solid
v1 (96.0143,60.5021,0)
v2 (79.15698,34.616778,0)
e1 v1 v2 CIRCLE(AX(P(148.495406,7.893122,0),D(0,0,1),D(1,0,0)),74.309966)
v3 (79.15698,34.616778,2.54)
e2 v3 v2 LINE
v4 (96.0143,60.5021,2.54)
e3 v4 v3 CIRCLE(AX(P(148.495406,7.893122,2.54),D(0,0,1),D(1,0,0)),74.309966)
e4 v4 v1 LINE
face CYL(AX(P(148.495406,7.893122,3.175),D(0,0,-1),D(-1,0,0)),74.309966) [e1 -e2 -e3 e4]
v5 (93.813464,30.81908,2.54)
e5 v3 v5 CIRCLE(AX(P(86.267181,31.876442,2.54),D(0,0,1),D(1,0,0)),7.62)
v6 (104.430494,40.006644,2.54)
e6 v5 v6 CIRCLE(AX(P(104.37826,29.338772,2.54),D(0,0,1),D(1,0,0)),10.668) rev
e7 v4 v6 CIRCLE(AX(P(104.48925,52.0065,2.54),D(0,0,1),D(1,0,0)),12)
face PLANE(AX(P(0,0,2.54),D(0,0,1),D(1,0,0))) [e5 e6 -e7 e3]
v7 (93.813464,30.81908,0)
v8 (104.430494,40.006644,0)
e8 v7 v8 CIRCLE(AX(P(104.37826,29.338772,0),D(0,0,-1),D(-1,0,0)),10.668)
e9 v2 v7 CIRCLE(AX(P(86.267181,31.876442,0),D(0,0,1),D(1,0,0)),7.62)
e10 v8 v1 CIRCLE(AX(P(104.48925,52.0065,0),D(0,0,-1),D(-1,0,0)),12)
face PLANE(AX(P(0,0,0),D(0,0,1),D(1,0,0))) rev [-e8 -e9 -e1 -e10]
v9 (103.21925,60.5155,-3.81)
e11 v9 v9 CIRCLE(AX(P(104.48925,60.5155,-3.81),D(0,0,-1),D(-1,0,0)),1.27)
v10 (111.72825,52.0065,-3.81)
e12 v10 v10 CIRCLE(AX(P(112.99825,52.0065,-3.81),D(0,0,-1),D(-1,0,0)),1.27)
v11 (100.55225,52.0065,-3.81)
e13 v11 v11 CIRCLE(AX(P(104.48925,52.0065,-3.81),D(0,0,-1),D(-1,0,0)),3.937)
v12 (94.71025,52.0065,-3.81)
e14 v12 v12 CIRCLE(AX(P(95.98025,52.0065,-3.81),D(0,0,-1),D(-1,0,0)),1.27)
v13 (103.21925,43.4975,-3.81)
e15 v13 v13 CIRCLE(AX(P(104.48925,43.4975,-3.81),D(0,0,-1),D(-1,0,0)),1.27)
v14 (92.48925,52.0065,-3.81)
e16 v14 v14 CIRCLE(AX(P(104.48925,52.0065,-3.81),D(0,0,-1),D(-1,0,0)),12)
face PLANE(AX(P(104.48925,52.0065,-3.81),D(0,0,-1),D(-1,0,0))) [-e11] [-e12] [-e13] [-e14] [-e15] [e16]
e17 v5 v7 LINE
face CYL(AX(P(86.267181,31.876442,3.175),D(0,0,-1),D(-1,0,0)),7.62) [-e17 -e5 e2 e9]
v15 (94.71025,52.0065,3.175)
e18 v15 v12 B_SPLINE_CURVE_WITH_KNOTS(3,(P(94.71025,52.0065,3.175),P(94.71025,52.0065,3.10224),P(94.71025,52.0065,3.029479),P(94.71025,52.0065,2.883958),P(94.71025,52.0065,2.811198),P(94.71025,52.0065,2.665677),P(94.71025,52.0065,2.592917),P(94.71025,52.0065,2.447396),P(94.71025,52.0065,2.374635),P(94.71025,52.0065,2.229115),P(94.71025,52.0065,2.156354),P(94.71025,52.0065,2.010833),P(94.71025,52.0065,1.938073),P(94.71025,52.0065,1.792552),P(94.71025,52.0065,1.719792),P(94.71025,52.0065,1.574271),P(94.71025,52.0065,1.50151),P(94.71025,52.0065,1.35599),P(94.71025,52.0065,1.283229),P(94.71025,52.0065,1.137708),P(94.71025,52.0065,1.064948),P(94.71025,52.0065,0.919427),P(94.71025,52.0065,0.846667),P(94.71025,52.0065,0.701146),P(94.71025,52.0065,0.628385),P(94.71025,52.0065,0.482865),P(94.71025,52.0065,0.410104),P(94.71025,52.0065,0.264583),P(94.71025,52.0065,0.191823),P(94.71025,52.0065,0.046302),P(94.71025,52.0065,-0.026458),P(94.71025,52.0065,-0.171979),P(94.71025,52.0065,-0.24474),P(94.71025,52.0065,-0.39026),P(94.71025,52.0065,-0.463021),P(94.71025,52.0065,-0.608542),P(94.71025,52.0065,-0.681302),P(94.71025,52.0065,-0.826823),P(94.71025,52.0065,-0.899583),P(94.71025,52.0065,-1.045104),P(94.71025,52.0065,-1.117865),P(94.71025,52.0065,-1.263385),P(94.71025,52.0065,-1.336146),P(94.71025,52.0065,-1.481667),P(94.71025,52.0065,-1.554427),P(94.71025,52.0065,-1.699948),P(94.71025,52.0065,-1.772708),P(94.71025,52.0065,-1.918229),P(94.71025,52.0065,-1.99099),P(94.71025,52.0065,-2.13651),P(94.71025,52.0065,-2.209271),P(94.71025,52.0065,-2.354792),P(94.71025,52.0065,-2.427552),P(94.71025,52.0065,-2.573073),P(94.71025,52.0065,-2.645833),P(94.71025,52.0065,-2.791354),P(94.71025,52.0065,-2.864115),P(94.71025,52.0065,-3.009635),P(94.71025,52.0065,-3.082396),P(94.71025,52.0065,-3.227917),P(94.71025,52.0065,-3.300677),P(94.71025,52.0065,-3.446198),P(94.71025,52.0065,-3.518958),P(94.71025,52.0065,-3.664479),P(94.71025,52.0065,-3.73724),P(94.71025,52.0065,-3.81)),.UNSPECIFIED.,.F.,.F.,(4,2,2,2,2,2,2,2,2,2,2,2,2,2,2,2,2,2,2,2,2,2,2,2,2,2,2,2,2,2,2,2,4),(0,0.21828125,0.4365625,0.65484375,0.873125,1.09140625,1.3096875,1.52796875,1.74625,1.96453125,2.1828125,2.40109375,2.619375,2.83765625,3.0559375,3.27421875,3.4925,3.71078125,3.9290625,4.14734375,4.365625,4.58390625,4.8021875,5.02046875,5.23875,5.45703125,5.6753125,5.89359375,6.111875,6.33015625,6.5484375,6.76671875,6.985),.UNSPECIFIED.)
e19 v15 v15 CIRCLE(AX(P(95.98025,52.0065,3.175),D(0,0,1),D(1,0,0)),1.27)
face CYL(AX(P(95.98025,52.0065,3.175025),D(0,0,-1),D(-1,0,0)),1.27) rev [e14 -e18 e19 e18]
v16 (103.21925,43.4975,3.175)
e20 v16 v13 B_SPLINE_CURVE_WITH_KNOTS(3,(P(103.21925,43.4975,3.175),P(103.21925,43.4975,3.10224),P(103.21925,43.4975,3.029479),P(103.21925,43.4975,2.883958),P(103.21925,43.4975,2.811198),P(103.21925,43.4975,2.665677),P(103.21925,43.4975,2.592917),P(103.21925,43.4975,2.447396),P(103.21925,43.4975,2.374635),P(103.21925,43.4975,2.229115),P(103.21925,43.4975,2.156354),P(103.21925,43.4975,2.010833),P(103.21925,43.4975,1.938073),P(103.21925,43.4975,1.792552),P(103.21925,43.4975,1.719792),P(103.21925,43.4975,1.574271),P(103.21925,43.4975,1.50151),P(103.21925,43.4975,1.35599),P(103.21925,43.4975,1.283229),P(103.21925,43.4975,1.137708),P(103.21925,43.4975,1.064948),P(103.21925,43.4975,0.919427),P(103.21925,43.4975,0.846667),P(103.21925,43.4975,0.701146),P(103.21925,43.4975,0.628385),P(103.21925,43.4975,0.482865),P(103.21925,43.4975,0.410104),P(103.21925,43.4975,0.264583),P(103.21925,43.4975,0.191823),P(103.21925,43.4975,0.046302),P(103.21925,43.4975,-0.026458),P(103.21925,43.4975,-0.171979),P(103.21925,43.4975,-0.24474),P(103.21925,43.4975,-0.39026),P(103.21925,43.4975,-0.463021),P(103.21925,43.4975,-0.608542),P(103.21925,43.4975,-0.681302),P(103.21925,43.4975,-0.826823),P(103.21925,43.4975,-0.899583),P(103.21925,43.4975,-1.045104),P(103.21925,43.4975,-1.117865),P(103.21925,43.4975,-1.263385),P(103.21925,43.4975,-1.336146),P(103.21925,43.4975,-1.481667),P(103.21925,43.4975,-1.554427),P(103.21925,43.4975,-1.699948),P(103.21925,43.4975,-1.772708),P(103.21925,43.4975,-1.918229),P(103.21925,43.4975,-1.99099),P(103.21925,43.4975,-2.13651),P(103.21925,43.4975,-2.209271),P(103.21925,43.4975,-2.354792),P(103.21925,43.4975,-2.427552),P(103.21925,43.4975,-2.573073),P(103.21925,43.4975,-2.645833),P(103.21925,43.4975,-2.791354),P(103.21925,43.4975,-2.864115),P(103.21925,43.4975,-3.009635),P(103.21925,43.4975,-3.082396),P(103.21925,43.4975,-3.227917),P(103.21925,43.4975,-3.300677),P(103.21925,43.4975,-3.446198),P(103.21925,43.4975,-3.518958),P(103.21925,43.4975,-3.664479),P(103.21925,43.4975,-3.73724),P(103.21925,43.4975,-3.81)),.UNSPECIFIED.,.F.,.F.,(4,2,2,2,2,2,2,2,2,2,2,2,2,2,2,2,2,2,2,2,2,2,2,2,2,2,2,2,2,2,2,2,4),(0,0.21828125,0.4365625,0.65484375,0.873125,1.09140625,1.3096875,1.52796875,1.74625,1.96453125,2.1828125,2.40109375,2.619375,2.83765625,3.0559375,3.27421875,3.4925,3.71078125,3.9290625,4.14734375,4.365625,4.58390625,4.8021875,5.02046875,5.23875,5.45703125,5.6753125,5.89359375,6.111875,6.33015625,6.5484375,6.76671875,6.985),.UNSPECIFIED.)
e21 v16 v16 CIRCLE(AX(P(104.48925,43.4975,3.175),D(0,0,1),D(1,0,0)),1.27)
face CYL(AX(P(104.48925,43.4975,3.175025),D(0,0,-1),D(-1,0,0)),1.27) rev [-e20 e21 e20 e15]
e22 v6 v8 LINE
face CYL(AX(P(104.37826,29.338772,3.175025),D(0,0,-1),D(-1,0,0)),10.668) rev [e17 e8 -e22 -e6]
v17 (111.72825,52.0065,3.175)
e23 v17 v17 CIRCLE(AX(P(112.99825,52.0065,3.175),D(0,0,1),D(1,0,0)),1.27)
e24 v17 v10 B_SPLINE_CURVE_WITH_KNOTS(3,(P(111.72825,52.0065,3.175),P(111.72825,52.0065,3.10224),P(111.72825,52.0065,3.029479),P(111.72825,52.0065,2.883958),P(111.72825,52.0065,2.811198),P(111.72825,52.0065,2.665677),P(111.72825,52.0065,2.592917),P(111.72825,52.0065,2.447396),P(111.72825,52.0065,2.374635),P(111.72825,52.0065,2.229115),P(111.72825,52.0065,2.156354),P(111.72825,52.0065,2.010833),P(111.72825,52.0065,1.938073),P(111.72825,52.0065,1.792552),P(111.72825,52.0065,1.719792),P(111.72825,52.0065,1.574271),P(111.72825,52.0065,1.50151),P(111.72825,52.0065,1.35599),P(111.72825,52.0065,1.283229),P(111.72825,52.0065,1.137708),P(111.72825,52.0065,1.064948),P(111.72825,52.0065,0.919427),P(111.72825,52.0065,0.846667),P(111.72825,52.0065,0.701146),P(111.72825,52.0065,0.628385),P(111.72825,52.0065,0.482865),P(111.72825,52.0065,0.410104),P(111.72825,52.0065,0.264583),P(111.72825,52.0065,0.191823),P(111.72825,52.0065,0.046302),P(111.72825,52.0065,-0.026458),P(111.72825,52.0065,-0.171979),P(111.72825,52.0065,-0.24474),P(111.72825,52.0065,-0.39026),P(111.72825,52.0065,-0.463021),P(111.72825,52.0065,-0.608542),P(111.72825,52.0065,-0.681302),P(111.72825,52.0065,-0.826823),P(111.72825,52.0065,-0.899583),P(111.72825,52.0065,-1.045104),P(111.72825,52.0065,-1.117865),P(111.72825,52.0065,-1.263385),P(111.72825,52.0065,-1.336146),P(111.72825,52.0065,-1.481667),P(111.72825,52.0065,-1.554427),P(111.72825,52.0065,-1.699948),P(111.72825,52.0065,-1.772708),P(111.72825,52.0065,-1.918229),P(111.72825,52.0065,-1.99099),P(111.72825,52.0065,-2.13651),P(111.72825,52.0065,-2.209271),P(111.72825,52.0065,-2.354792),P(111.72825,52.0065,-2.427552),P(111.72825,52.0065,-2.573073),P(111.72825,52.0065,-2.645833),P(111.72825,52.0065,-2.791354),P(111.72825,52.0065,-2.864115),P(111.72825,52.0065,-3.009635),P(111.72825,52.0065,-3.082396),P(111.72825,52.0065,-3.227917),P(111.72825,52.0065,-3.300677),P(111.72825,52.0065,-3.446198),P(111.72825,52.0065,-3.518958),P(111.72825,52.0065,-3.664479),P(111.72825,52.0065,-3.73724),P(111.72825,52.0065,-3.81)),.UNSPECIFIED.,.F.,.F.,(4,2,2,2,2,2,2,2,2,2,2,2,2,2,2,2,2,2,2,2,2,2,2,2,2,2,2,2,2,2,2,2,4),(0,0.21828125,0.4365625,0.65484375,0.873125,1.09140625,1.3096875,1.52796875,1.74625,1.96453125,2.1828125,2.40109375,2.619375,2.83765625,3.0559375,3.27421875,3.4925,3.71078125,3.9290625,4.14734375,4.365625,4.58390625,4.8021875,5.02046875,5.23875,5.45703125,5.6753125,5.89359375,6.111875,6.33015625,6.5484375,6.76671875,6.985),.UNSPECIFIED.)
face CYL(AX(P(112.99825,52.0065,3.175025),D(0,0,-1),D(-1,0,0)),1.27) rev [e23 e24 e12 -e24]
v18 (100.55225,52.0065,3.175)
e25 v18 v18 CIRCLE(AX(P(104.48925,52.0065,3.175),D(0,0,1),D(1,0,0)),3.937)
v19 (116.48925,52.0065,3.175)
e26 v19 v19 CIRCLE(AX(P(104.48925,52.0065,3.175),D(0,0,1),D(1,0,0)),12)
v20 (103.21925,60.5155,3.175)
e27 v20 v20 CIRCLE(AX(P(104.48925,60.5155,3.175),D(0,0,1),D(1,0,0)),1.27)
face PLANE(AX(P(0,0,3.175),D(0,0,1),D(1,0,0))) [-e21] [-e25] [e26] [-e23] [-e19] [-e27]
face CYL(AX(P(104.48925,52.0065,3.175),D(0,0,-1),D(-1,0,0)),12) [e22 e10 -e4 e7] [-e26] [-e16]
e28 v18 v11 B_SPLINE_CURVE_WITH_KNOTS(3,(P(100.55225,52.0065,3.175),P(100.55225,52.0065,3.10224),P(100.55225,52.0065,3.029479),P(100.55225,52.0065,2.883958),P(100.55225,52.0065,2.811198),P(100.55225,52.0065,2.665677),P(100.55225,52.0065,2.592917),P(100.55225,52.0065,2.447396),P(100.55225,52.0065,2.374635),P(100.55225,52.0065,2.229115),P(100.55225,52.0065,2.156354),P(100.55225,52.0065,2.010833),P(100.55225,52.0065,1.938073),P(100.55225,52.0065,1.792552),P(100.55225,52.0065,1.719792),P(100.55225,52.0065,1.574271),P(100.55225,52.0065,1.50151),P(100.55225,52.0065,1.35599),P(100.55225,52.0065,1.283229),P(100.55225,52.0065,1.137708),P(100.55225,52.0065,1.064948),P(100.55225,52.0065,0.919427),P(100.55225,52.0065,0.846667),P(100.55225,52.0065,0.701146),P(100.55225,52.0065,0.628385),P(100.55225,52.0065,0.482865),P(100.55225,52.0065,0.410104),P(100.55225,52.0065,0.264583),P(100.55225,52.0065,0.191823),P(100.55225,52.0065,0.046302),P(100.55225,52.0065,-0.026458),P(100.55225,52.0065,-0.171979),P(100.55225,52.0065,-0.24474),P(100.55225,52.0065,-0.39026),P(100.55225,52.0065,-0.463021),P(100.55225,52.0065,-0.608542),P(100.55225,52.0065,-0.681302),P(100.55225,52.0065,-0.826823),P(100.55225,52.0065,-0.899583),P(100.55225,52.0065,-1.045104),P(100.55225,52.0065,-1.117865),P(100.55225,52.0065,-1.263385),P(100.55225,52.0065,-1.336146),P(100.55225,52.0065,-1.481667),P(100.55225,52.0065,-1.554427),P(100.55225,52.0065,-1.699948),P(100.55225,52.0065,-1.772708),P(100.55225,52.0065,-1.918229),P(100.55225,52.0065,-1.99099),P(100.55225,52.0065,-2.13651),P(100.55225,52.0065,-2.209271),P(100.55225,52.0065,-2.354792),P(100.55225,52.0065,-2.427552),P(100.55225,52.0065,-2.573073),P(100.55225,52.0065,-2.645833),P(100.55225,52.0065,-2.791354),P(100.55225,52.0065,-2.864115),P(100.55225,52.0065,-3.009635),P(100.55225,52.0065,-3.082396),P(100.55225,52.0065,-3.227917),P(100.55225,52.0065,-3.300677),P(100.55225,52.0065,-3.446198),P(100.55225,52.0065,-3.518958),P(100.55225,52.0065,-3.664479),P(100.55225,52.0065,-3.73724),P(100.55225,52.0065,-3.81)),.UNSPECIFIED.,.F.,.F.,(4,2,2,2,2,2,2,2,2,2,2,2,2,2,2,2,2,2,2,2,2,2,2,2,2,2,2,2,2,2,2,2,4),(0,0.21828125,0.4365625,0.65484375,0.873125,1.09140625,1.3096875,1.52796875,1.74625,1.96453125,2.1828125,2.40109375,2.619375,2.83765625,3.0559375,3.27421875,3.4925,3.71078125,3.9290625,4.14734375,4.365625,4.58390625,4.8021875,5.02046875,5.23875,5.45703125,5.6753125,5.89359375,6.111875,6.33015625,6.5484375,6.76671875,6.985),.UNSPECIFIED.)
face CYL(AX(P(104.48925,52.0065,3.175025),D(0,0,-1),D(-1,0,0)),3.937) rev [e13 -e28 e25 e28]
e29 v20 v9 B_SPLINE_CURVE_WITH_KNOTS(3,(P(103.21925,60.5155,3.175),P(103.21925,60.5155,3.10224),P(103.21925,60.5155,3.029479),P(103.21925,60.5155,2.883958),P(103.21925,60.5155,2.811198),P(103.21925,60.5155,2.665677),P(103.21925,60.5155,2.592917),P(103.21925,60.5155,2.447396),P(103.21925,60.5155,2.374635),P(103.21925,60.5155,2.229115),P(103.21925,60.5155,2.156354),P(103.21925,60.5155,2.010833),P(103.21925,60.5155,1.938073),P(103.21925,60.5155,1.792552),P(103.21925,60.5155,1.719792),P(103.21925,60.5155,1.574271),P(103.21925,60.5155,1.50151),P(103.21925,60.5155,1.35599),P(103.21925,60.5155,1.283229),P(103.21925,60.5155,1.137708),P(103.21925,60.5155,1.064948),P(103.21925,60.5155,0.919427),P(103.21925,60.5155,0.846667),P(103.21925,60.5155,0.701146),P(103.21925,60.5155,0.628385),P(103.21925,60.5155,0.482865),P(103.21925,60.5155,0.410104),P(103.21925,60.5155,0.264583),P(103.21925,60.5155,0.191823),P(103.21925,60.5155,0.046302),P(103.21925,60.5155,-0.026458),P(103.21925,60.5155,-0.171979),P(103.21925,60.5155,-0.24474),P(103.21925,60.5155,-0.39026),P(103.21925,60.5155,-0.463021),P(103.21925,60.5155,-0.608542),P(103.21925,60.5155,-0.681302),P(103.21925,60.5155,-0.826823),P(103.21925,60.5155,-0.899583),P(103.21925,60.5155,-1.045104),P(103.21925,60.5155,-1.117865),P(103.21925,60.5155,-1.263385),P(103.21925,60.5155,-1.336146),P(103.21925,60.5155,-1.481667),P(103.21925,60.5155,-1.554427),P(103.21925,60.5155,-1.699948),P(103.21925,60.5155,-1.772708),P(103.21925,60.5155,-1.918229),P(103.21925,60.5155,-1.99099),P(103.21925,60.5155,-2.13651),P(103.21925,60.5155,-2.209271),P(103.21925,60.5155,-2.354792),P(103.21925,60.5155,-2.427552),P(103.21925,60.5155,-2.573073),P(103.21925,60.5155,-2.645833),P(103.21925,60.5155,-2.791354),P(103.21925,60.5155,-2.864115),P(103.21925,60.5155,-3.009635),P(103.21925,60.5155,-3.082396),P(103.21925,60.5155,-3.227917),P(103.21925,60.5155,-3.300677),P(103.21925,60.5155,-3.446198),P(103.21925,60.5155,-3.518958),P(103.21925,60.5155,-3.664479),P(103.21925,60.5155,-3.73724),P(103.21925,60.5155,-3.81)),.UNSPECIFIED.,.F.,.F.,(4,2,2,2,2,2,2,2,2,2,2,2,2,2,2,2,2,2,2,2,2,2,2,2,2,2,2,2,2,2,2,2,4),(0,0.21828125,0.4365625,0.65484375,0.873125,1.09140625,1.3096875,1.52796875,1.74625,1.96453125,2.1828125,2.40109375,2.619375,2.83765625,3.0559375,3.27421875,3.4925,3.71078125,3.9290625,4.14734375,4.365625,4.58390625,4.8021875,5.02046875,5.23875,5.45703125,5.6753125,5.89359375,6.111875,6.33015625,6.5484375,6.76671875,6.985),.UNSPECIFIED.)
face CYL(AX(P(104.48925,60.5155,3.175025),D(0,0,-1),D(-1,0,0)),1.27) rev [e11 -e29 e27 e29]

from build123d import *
from build123d.topology import SkipClean

# Parameters (mm, degrees)
BOSS_EXTRUDE1_DEPTH = 3.175
BOSS_EXTRUDE2_START = 3.81
SKETCH2_R           = 12
BOSS_EXTRUDE2_DEPTH = 3.81
SKETCH3_R           = 3.937
CUT_EXTRUDE1_DEPTH  = 134.099089527
SKETCH4_R           = 1.27
CUT_EXTRUDE2_DEPTH  = 134.099089527
CUT_EXTRUDE3_DEPTH  = 133.970273023
CUT_EXTRUDE4_START  = -0.635
CUT_EXTRUDE4_DEPTH  = 0.635


with BuildPart() as part:
    # Sketch1 → Boss-Extrude1 (new body)
    with BuildSketch(Plane.XY):
        with BuildLine():
            ThreePointArc((113.784062988, 44.416608597), (112.542436022, 60.902914722), (96.014300162, 60.502100346))
            ThreePointArc((96.014300162, 60.502100346), (86.225733854, 48.445051897), (79.156979953, 34.616777747))
            ThreePointArc((79.156979953, 34.616777747), (81.153408489, 26.227218543), (89.699693339, 25.073335615))
            ThreePointArc((89.699693339, 25.073335615), (102.758092485, 33.479680479), (113.784062988, 44.416608597))
        make_face()
    extrude(amount=BOSS_EXTRUDE1_DEPTH)

    # Sketch2 → Boss-Extrude2 (add)
    with SkipClean():  # the faces are left unmerged after this step: merging them gives an invalid solid
        with BuildSketch(Plane(origin=(0, 0, 0), x_dir=(-1, 0, 0), z_dir=(0, 0, -1)).offset(BOSS_EXTRUDE2_START)):
            with Locations((-104.48925, 52.0065)):
                Circle(SKETCH2_R)
        extrude(amount=-BOSS_EXTRUDE2_DEPTH)

    # Sketch3 → Cut-Extrude1 (cut, through all)
    with SkipClean():  # the faces are left unmerged after this step: merging them gives an invalid solid
        with BuildSketch(Plane(origin=(0, 0, -3.81), x_dir=(-1, 0, 0), z_dir=(0, 0, -1))):
            with Locations((-104.48925, 52.0065)):
                Circle(SKETCH3_R)
        extrude(amount=-CUT_EXTRUDE1_DEPTH, mode=Mode.SUBTRACT)

    # Sketch4 → Cut-Extrude2 (cut, through all)
    with SkipClean():  # the faces are left unmerged after this step: merging them gives an invalid solid
        with BuildSketch(Plane(origin=(0, 0, -3.81), x_dir=(-1, 0, 0), z_dir=(0, 0, -1))):
            with Locations((-95.98025, 52.0065)):
                Circle(SKETCH4_R)
            with Locations((-112.99825, 52.0065)):
                Circle(SKETCH4_R)
            with Locations((-104.48925, 43.4975)):
                Circle(SKETCH4_R)
            with Locations((-104.48925, 60.5155)):
                Circle(SKETCH4_R)
        extrude(amount=-CUT_EXTRUDE2_DEPTH, mode=Mode.SUBTRACT)

    # Sketch5 → Cut-Extrude3 (cut, through all)
    with SkipClean():  # the faces are left unmerged after this step: merging them gives an invalid solid
        with BuildSketch(Plane(origin=(0, 0, 0), x_dir=(-1, 0, 0), z_dir=(0, 0, -1))):
            with BuildLine():
                ThreePointArc((-104.430493989, 40.006643845), (-109.606684651, 41.15238269), (-113.7840634, 44.4166091))
                ThreePointArc((-113.7840634, 44.4166091), (-102.758092767, 33.479680706), (-89.699693406, 25.073335649))
                ThreePointArc((-89.699693406, 25.073335649), (-92.462895691, 27.440507008), (-93.81346398, 30.819079549))
                ThreePointArc((-93.81346398, 30.819079549), (-97.397477458, 37.40567327), (-104.430493989, 40.006643845))
            make_face()
        extrude(amount=-CUT_EXTRUDE3_DEPTH, mode=Mode.SUBTRACT)

    # Sketch6 → Cut-Extrude4 (cut)
    with SkipClean():  # the faces are left unmerged after this step: merging them gives an invalid solid
        with BuildSketch(Plane.XY.offset(3.175).offset(CUT_EXTRUDE4_START)):
            with BuildLine():
                ThreePointArc((96.014299675, 60.502099861), (86.225733771, 48.44505177), (79.156980092, 34.616778107))
                ThreePointArc((79.156980092, 34.616778107), (84.355854315, 24.500045491), (93.81346398, 30.819079549))
                ThreePointArc((93.81346398, 30.819079549), (97.397477458, 37.40567327), (104.430493989, 40.006643845))
                ThreePointArc((104.430493989, 40.006643845), (93.388711037, 47.448207038), (96.014299675, 60.502099861))
            make_face()
        extrude(amount=CUT_EXTRUDE4_DEPTH, mode=Mode.SUBTRACT)


solid = part.part
